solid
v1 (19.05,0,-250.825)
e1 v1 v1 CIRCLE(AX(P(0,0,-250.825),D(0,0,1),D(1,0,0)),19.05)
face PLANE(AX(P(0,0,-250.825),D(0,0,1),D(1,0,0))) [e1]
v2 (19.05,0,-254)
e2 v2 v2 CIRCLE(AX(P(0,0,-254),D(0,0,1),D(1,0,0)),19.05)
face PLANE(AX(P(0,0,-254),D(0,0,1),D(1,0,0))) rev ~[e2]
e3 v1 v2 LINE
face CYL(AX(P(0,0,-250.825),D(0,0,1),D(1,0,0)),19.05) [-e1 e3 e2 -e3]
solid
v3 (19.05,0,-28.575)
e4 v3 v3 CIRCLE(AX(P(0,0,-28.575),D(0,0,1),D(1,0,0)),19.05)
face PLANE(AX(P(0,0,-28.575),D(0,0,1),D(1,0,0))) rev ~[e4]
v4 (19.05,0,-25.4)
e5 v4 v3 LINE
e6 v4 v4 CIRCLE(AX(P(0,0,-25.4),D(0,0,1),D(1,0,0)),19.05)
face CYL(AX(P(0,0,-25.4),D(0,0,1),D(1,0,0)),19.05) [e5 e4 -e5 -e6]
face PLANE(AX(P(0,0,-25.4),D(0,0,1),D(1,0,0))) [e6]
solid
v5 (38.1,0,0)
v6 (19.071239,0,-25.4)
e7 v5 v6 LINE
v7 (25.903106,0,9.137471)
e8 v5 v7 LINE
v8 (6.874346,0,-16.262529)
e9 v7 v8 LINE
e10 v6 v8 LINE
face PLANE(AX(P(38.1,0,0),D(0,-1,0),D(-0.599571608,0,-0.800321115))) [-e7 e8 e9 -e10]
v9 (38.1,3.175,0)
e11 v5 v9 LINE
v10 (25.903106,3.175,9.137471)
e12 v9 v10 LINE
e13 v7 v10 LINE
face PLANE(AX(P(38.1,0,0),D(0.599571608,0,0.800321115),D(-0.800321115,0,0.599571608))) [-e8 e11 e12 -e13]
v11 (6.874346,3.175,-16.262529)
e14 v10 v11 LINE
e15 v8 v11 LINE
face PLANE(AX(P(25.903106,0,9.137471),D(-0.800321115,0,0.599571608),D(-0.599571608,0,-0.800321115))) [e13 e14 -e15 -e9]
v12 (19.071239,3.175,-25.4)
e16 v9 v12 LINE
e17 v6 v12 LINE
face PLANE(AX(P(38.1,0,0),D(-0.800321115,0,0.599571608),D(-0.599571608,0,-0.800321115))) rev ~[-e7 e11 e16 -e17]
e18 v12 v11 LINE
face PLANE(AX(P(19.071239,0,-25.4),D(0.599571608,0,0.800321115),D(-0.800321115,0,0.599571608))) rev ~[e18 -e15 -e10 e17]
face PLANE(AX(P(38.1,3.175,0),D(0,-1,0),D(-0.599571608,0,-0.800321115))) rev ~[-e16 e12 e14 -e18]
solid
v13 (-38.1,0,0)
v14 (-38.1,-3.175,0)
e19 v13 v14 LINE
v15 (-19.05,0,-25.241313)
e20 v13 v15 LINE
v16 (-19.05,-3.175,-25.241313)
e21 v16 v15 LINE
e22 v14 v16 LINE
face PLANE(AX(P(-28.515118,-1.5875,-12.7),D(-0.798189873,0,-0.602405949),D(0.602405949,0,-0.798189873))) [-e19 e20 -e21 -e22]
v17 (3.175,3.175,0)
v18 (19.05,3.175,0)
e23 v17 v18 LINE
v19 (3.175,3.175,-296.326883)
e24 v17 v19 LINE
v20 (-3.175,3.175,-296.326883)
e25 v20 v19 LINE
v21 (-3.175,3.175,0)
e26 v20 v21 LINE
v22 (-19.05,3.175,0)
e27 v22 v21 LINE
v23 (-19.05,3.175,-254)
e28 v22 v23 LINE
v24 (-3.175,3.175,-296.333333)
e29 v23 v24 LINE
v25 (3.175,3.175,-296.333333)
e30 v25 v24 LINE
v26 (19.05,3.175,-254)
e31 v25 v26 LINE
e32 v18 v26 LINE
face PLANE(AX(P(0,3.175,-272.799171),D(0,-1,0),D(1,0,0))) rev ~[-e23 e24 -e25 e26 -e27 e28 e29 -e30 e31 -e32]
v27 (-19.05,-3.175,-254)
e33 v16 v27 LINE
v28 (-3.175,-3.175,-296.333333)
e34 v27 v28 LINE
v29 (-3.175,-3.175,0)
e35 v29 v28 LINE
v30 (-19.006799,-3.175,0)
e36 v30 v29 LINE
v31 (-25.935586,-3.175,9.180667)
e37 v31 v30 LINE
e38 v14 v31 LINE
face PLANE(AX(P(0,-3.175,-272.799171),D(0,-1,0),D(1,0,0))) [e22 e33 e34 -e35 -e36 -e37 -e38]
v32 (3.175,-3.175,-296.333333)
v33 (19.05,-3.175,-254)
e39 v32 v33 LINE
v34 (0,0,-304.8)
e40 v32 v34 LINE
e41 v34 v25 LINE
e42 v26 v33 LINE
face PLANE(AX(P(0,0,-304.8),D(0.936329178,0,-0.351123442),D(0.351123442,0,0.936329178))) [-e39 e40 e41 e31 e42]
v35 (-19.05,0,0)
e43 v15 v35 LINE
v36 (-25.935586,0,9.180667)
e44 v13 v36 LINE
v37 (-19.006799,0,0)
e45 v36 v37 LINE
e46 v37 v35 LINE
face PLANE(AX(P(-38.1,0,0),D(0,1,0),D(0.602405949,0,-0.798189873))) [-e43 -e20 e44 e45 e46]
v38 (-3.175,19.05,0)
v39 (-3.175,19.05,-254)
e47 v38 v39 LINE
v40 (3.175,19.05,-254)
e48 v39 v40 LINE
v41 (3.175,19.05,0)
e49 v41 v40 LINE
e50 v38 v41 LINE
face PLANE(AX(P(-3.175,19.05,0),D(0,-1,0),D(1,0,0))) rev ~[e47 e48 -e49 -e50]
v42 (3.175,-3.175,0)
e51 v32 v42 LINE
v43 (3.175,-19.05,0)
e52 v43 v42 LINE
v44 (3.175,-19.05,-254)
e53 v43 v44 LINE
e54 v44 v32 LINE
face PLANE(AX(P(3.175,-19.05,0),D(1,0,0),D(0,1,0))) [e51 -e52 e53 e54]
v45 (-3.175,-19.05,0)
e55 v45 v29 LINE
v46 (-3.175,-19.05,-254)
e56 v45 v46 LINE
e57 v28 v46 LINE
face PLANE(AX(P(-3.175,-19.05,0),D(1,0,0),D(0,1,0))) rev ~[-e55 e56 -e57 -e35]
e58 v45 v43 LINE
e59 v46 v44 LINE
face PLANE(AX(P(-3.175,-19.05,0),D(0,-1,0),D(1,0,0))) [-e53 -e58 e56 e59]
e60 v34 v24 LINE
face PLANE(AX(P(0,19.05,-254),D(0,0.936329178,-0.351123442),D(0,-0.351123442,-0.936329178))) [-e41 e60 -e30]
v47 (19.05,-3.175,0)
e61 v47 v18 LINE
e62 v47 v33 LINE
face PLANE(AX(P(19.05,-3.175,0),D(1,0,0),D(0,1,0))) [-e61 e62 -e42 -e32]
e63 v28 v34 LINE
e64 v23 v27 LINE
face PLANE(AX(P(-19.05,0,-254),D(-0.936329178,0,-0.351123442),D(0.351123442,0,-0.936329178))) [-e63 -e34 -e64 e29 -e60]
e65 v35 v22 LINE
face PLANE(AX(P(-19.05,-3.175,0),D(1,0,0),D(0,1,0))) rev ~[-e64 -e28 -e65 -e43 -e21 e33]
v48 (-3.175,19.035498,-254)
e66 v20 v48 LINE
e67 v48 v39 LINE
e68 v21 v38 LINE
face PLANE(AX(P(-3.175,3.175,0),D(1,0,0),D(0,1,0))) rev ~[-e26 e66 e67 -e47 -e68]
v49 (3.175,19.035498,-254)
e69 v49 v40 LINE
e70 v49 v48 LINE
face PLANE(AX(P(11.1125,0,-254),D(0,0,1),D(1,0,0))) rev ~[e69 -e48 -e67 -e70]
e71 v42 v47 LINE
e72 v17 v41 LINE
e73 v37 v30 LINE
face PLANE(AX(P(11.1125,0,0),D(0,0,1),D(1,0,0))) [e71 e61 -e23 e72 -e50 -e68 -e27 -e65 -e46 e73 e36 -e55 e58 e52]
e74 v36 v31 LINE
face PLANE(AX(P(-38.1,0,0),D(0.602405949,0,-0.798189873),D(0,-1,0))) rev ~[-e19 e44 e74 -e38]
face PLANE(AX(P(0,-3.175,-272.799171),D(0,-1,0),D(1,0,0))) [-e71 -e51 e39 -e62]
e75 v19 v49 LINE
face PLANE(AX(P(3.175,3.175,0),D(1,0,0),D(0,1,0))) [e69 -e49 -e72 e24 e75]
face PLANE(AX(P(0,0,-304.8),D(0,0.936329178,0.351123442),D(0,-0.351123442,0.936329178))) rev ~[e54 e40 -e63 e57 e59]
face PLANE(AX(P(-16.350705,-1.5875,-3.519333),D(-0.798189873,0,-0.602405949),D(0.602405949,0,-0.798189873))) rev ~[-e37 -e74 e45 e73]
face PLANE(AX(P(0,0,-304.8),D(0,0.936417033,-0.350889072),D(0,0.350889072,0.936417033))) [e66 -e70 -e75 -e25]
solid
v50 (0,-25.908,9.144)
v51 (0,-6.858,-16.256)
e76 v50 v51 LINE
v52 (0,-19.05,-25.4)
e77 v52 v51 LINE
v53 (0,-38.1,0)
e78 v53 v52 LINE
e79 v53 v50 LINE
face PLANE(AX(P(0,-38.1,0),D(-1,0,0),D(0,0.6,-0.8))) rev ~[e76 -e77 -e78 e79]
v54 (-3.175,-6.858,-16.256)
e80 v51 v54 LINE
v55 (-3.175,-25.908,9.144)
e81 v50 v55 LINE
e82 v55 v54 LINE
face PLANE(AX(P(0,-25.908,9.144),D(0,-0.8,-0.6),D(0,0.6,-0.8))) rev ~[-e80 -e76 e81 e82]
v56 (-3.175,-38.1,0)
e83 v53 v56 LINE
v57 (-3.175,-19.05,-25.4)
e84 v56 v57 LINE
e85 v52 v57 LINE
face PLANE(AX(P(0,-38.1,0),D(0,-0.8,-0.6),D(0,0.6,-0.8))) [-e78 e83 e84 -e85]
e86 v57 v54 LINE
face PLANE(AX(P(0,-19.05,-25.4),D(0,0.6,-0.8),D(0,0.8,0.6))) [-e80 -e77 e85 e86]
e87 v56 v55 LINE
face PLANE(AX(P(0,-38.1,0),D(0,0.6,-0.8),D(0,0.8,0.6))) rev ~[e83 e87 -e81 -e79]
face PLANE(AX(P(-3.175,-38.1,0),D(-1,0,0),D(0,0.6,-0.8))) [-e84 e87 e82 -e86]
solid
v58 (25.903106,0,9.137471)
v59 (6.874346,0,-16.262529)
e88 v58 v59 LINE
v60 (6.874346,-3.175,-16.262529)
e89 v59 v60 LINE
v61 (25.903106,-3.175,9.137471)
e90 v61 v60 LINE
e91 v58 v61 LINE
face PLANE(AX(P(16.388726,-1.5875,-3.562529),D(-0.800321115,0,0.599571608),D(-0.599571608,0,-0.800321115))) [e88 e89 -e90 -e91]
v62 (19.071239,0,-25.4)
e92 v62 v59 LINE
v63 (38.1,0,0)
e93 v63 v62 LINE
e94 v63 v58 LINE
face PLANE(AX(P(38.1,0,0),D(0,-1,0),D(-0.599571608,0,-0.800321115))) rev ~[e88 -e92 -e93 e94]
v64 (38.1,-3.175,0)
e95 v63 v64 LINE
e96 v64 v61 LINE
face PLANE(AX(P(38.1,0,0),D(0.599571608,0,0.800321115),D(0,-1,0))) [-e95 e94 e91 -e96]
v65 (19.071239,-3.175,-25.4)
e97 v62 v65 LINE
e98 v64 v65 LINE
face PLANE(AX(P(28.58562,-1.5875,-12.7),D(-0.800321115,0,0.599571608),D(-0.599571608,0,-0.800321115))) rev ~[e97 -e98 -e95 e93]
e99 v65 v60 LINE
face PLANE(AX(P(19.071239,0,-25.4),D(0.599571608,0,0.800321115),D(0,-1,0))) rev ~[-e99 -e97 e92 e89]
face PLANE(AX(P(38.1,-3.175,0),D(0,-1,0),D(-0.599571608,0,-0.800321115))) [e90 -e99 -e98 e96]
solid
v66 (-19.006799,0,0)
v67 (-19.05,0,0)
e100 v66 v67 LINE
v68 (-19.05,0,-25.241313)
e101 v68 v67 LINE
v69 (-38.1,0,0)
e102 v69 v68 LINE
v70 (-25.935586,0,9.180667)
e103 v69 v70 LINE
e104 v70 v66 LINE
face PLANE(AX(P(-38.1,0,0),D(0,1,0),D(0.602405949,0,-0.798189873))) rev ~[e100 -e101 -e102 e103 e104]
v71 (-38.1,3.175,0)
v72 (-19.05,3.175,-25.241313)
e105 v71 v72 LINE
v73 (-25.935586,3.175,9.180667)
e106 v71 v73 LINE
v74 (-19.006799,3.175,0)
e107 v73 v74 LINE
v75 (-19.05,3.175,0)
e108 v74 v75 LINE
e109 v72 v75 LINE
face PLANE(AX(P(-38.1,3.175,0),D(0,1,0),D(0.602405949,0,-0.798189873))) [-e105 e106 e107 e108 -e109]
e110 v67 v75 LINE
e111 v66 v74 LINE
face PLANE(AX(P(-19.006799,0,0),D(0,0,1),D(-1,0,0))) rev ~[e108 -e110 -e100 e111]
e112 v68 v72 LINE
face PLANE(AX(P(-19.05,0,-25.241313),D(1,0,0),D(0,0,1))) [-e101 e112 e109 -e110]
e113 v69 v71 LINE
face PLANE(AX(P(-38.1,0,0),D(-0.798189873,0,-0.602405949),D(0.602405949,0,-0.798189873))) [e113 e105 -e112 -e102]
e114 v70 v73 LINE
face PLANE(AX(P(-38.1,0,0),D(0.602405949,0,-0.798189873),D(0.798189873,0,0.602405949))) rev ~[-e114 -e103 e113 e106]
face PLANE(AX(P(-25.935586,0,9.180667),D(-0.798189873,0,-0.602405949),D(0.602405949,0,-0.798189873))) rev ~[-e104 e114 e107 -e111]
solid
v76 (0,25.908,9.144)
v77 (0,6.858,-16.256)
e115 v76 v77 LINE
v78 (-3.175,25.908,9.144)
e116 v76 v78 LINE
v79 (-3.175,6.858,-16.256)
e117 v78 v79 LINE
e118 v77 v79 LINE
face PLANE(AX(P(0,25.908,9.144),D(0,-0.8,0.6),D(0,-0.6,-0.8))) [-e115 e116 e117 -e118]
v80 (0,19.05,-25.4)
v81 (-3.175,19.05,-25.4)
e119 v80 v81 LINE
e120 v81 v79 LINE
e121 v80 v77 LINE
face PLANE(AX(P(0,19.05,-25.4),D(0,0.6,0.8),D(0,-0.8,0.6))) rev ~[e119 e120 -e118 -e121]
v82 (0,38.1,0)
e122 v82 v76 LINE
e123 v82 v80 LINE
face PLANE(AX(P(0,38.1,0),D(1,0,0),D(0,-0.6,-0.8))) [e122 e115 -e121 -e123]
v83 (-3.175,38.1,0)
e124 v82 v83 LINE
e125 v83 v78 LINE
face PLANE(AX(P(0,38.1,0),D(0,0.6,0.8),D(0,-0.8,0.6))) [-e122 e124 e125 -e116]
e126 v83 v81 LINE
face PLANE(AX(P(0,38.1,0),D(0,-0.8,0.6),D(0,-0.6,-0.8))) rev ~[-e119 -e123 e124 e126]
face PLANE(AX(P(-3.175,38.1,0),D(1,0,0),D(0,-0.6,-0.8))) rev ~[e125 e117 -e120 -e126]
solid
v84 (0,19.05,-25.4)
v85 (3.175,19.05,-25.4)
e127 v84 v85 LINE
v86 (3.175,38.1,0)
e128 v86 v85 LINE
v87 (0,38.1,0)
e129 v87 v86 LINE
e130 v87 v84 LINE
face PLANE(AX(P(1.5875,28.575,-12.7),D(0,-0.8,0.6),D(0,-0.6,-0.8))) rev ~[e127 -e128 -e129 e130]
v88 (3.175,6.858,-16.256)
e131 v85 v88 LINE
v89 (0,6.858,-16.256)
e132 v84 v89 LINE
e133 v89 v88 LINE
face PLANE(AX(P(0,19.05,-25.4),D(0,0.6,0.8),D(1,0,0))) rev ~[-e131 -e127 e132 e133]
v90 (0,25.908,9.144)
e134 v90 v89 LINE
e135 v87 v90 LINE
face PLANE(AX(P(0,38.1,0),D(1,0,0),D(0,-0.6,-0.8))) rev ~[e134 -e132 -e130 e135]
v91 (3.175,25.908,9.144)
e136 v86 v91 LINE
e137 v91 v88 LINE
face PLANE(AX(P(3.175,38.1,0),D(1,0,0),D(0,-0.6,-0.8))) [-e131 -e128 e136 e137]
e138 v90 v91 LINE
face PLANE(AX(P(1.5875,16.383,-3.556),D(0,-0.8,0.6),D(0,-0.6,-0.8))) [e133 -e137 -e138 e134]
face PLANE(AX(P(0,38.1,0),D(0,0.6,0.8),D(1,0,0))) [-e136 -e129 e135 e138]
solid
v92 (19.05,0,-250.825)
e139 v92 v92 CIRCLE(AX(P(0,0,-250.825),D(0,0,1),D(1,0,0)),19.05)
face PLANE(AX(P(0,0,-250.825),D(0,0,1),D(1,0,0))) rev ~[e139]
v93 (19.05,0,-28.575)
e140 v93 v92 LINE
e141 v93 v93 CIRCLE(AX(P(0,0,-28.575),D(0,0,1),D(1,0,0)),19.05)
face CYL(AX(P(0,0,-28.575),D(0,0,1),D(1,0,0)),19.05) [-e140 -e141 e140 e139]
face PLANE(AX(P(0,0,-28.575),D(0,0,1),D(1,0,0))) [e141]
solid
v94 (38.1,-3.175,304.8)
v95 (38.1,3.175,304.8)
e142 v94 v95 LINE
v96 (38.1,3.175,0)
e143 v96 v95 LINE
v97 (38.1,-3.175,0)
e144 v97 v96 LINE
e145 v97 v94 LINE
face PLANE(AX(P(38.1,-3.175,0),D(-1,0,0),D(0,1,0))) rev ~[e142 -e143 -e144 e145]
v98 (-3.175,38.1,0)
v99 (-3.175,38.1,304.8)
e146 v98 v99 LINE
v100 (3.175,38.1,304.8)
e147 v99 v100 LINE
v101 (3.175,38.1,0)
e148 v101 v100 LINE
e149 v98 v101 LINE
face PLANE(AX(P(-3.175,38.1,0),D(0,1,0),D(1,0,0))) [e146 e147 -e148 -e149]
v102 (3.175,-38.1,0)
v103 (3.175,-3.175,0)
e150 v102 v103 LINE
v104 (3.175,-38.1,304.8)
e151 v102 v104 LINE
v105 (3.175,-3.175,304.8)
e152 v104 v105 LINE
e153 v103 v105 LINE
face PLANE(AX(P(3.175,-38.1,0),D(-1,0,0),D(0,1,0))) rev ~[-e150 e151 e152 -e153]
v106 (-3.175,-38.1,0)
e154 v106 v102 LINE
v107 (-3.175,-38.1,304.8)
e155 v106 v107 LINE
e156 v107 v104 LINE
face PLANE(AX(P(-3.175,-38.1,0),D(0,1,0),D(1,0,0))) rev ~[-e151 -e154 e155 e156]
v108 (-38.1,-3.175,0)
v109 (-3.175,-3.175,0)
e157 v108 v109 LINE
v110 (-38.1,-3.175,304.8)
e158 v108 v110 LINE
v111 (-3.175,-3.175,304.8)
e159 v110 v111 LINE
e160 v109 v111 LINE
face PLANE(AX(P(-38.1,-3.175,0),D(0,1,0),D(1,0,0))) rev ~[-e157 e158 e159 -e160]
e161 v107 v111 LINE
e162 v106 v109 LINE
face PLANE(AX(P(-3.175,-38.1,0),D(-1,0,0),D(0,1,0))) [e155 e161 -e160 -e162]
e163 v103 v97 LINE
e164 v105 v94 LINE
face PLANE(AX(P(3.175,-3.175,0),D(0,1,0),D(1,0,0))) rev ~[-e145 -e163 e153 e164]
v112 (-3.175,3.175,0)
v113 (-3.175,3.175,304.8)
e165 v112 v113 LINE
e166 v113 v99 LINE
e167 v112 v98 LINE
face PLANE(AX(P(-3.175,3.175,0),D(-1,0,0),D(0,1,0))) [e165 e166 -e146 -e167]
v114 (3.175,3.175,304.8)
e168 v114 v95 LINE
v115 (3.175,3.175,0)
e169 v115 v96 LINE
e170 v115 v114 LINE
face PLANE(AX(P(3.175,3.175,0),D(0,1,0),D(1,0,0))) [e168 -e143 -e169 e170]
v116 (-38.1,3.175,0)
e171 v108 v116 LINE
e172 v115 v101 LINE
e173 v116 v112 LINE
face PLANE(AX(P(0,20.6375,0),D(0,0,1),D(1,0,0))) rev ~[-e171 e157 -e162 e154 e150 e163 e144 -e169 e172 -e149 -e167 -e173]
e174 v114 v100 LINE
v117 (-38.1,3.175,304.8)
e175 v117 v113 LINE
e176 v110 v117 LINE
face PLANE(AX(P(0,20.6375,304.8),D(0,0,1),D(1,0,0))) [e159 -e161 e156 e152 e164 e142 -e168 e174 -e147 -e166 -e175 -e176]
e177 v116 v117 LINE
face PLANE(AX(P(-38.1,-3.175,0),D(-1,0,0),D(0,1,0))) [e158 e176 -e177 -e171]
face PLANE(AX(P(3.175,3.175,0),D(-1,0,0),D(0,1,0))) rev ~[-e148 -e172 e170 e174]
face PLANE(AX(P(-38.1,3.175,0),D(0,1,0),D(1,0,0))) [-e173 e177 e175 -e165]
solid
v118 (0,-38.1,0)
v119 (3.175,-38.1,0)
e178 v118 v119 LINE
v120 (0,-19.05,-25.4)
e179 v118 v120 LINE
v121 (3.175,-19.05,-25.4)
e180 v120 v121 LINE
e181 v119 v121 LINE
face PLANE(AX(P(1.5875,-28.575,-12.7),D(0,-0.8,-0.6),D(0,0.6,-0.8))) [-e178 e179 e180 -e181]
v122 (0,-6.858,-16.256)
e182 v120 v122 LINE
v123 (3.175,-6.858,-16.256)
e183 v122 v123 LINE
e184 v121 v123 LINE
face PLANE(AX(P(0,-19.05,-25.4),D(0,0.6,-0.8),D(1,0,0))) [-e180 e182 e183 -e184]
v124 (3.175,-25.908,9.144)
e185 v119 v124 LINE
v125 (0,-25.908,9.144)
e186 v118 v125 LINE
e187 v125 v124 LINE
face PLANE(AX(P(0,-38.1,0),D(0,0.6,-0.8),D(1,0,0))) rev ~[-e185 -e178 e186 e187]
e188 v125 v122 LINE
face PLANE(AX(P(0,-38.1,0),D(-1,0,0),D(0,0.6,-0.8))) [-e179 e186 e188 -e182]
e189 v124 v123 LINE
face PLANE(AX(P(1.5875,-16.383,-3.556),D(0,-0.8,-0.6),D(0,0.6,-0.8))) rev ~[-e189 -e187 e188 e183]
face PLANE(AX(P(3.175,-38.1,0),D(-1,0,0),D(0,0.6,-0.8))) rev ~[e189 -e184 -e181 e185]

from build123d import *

# Parameters (mm, degrees)
F0_W           = 6.35
F0_H           = 34.925
F0_W_2         = 34.925
F0_H_2         = 6.35
F1_DEPTH       = 304.8
F2_W           = 15.875
F2_H           = 6.35
F2_W_2         = 6.35
F2_H_2         = 15.875
F3_DEPTH       = 254
F5_E4_W        = 31.7372608571
F5_E4_H        = 3.175
F6_DEPTH       = 15.24
F7_DEPTH       = 3.175
F9_E5_W        = 31.8220023402
F9_E5_H        = 3.175
F10_DEPTH      = 15.24
F11_DEPTH      = 3.175
F13_E6_W       = 31.75
F13_E6_H       = 3.175
F14_DEPTH      = 15.24
F15_DEPTH      = 3.175
F16_E7_W       = 31.75
F16_E7_H       = 3.175
F17_DEPTH      = 15.24
F18_DEPTH      = 3.175
F20_START      = -28.575
F19_R          = 19.05
F20_DEPTH      = 222.25
F22_START      = -25.4
F21_R          = 19.05
F22_DEPTH      = 3.175
F24_START      = -250.825
F23_R          = 19.05
F24_DEPTH      = 3.175
F26_DEPTH      = 3.175
F26_DEPTH_BACK = 3.175
F28_DEPTH      = 3.175
F28_DEPTH_BACK = 3.175
F30_DEPTH      = 25.4
F30_DEPTH_BACK = 25.4
F32_DEPTH      = 25.4
F32_DEPTH_BACK = 25.4
F34_DEPTH      = 25.4
F34_DEPTH_BACK = 25.4
F36_DEPTH      = 25.4
F36_DEPTH_BACK = 25.4


with BuildPart() as f1:
    # F0 (on Top) → F1 (new body)
    with BuildSketch(Plane.XY):
        with Locations((0, 20.6375)):
            Rectangle(F0_W, F0_H)
        with Locations((-20.6375, 0)):
            Rectangle(F0_W_2, F0_H_2)
        with Locations((0, -20.6375)):
            Rectangle(F0_W, F0_H)
        Rectangle(F0_W, F0_H_2)
        with Locations((20.6375, 0)):
            Rectangle(F0_W_2, F0_H_2)
    extrude(amount=F1_DEPTH)


with BuildPart() as f3:
    # F2 (on Top) → F3 (new body)
    with BuildSketch(Plane.XY):
        with Locations((11.1125, 0)):
            Rectangle(F2_W, F2_H)
        with Locations((-11.1125, 0)):
            Rectangle(F2_W, F2_H)
        with Locations((0, 11.1125)):
            Rectangle(F2_W_2, F2_H_2)
        with Locations((0, -11.1125)):
            Rectangle(F2_W_2, F2_H_2)
        Rectangle(F2_W_2, F2_H)
    extrude(amount=-F3_DEPTH)

    # F9_E5 (on explicit) → F10 (join)
    with BuildSketch(Plane(origin=(-38.1, 0, 0), x_dir=(0.6024059487, 0, -0.7981898728), z_dir=(-0.7981898728, 0, -0.6024059487))):
        with Locations((15.9110011701, 1.5875)):
            Rectangle(F9_E5_W, F9_E5_H)
    extrude(amount=-F10_DEPTH)


with BuildPart() as f6:
    # F5_E4 (on explicit) → F6 (new body)
    with BuildSketch(Plane(origin=(38.1, 0, 0), x_dir=(-0.5995716076, 0, -0.8003211151), z_dir=(-0.8003211151, 0, 0.5995716076))):
        with Locations((15.8686304286, 1.5875)):
            Rectangle(F5_E4_W, F5_E4_H)
    extrude(amount=F6_DEPTH)


with BuildPart() as f7:
    # F7 (new): a face of the model
    f7_faces = [f6.part.faces().sort_by_distance(p)[0] for p in [
        (22.4871728456, 0, -8.1312643497),
    ]]
    extrude(f7_faces, amount=F7_DEPTH)


with BuildPart() as f11:
    # F11 (new): a face of the model
    f11_faces = [f3.part.faces().sort_by_distance(p)[0] for p in [
        (-26.0093205112, 0, -5.3484628484),
    ]]
    extrude(f11_faces, amount=F11_DEPTH)


with BuildPart() as f14:
    # F13_E6 (on explicit) → F14 (new body)
    with BuildSketch(Plane(origin=(0, 38.1, 0), x_dir=(0, -0.6, -0.8), z_dir=(0, -0.8, 0.6))):
        with Locations((15.875, 1.5875)):
            Rectangle(F13_E6_W, F13_E6_H)
    extrude(amount=F14_DEPTH)


with BuildPart() as f15:
    # F15 (new): a face of the model
    f15_faces = [f14.part.faces().sort_by_distance(p)[0] for p in [
        (0, 22.479, -8.128),
    ]]
    extrude(f15_faces, amount=F15_DEPTH)


with BuildPart() as f17:
    # F16_E7 (on explicit) → F17 (new body)
    with BuildSketch(Plane(origin=(0, -38.1, 0), x_dir=(0, 0.6, -0.8), z_dir=(0, -0.8, -0.6))):
        with Locations((15.875, 1.5875)):
            Rectangle(F16_E7_W, F16_E7_H)
    extrude(amount=-F17_DEPTH)


with BuildPart() as f18:
    # F18 (new): a face of the model
    f18_faces = [f17.part.faces().sort_by_distance(p)[0] for p in [
        (0, -22.479, -8.128),
    ]]
    extrude(f18_faces, amount=F18_DEPTH)


with BuildPart() as f20:
    # F19 (on Top) → F20 (new body)
    with BuildSketch(Plane.XY.offset(F20_START)):
        Circle(F19_R)
    extrude(amount=-F20_DEPTH)


with BuildPart() as f22:
    # F21 (on Top) → F22 (new body)
    with BuildSketch(Plane.XY.offset(F22_START)):
        Circle(F21_R)
    extrude(amount=-F22_DEPTH)


with BuildPart() as f24:
    # F23 (on Top) → F24 (new body)
    with BuildSketch(Plane.XY.offset(F24_START)):
        Circle(F23_R)
    extrude(amount=-F24_DEPTH)


with BuildPart() as f3_1:
    add(f3.part)

    # F25 (on Front) → F26 (join, two sides)
    with BuildSketch(Plane.XZ) as f26_sk:
        Polygon((0, -304.8), (19.05, -254), (-19.05, -254), align=None)
    extrude(amount=F26_DEPTH)
    extrude(f26_sk.sketch, amount=-F26_DEPTH_BACK)

    # F27 (on Right) → F28 (join, two sides)
    with BuildSketch(Plane.YZ) as f28_sk:
        Polygon((19.05, -253.961299397), (-19.05, -254), (0, -304.8), align=None)
    extrude(amount=F28_DEPTH)
    extrude(f28_sk.sketch, amount=-F28_DEPTH_BACK)

    # F29 (on Front) → F30 (cut, two sides)
    with BuildSketch(Plane.XZ) as f30_sk:
        Polygon((14.5053900778, -306.9541752338), (19.05, -254), (0, -304.8), align=None)
    extrude(amount=-F30_DEPTH, mode=Mode.SUBTRACT)
    extrude(f30_sk.sketch, amount=F30_DEPTH_BACK, mode=Mode.SUBTRACT)

    # F31 (on Front) → F32 (cut, two sides)
    with BuildSketch(Plane.XZ) as f32_sk:
        Polygon((0, -304.8), (-19.05, -254), (-17.9964636892, -308.1513562202), align=None)
    extrude(amount=-F32_DEPTH, mode=Mode.SUBTRACT)
    extrude(f32_sk.sketch, amount=F32_DEPTH_BACK, mode=Mode.SUBTRACT)

    # F33 (on Right) → F34 (cut, two sides)
    with BuildSketch(Plane.YZ) as f34_sk:
        Polygon((0, -304.8), (-19.0134039452, -254.0975894796), (-19.4287896156, -254.4830143452), (-21.6469541192, -304.8), align=None)
    extrude(amount=-F34_DEPTH, mode=Mode.SUBTRACT)
    extrude(f34_sk.sketch, amount=F34_DEPTH_BACK, mode=Mode.SUBTRACT)

    # F35 (on Right) → F36 (cut, two sides)
    with BuildSketch(Plane.YZ) as f36_sk:
        Polygon((28.5147875547, -304.8), (19.05, -254), (0, -304.8), align=None)
    extrude(amount=-F36_DEPTH, mode=Mode.SUBTRACT)
    extrude(f36_sk.sketch, amount=F36_DEPTH_BACK, mode=Mode.SUBTRACT)


solid = Compound([f1.part, f6.part, f7.part, f11.part, f14.part, f15.part, f17.part, f18.part, f20.part, f22.part, f24.part, f3_1.part])
